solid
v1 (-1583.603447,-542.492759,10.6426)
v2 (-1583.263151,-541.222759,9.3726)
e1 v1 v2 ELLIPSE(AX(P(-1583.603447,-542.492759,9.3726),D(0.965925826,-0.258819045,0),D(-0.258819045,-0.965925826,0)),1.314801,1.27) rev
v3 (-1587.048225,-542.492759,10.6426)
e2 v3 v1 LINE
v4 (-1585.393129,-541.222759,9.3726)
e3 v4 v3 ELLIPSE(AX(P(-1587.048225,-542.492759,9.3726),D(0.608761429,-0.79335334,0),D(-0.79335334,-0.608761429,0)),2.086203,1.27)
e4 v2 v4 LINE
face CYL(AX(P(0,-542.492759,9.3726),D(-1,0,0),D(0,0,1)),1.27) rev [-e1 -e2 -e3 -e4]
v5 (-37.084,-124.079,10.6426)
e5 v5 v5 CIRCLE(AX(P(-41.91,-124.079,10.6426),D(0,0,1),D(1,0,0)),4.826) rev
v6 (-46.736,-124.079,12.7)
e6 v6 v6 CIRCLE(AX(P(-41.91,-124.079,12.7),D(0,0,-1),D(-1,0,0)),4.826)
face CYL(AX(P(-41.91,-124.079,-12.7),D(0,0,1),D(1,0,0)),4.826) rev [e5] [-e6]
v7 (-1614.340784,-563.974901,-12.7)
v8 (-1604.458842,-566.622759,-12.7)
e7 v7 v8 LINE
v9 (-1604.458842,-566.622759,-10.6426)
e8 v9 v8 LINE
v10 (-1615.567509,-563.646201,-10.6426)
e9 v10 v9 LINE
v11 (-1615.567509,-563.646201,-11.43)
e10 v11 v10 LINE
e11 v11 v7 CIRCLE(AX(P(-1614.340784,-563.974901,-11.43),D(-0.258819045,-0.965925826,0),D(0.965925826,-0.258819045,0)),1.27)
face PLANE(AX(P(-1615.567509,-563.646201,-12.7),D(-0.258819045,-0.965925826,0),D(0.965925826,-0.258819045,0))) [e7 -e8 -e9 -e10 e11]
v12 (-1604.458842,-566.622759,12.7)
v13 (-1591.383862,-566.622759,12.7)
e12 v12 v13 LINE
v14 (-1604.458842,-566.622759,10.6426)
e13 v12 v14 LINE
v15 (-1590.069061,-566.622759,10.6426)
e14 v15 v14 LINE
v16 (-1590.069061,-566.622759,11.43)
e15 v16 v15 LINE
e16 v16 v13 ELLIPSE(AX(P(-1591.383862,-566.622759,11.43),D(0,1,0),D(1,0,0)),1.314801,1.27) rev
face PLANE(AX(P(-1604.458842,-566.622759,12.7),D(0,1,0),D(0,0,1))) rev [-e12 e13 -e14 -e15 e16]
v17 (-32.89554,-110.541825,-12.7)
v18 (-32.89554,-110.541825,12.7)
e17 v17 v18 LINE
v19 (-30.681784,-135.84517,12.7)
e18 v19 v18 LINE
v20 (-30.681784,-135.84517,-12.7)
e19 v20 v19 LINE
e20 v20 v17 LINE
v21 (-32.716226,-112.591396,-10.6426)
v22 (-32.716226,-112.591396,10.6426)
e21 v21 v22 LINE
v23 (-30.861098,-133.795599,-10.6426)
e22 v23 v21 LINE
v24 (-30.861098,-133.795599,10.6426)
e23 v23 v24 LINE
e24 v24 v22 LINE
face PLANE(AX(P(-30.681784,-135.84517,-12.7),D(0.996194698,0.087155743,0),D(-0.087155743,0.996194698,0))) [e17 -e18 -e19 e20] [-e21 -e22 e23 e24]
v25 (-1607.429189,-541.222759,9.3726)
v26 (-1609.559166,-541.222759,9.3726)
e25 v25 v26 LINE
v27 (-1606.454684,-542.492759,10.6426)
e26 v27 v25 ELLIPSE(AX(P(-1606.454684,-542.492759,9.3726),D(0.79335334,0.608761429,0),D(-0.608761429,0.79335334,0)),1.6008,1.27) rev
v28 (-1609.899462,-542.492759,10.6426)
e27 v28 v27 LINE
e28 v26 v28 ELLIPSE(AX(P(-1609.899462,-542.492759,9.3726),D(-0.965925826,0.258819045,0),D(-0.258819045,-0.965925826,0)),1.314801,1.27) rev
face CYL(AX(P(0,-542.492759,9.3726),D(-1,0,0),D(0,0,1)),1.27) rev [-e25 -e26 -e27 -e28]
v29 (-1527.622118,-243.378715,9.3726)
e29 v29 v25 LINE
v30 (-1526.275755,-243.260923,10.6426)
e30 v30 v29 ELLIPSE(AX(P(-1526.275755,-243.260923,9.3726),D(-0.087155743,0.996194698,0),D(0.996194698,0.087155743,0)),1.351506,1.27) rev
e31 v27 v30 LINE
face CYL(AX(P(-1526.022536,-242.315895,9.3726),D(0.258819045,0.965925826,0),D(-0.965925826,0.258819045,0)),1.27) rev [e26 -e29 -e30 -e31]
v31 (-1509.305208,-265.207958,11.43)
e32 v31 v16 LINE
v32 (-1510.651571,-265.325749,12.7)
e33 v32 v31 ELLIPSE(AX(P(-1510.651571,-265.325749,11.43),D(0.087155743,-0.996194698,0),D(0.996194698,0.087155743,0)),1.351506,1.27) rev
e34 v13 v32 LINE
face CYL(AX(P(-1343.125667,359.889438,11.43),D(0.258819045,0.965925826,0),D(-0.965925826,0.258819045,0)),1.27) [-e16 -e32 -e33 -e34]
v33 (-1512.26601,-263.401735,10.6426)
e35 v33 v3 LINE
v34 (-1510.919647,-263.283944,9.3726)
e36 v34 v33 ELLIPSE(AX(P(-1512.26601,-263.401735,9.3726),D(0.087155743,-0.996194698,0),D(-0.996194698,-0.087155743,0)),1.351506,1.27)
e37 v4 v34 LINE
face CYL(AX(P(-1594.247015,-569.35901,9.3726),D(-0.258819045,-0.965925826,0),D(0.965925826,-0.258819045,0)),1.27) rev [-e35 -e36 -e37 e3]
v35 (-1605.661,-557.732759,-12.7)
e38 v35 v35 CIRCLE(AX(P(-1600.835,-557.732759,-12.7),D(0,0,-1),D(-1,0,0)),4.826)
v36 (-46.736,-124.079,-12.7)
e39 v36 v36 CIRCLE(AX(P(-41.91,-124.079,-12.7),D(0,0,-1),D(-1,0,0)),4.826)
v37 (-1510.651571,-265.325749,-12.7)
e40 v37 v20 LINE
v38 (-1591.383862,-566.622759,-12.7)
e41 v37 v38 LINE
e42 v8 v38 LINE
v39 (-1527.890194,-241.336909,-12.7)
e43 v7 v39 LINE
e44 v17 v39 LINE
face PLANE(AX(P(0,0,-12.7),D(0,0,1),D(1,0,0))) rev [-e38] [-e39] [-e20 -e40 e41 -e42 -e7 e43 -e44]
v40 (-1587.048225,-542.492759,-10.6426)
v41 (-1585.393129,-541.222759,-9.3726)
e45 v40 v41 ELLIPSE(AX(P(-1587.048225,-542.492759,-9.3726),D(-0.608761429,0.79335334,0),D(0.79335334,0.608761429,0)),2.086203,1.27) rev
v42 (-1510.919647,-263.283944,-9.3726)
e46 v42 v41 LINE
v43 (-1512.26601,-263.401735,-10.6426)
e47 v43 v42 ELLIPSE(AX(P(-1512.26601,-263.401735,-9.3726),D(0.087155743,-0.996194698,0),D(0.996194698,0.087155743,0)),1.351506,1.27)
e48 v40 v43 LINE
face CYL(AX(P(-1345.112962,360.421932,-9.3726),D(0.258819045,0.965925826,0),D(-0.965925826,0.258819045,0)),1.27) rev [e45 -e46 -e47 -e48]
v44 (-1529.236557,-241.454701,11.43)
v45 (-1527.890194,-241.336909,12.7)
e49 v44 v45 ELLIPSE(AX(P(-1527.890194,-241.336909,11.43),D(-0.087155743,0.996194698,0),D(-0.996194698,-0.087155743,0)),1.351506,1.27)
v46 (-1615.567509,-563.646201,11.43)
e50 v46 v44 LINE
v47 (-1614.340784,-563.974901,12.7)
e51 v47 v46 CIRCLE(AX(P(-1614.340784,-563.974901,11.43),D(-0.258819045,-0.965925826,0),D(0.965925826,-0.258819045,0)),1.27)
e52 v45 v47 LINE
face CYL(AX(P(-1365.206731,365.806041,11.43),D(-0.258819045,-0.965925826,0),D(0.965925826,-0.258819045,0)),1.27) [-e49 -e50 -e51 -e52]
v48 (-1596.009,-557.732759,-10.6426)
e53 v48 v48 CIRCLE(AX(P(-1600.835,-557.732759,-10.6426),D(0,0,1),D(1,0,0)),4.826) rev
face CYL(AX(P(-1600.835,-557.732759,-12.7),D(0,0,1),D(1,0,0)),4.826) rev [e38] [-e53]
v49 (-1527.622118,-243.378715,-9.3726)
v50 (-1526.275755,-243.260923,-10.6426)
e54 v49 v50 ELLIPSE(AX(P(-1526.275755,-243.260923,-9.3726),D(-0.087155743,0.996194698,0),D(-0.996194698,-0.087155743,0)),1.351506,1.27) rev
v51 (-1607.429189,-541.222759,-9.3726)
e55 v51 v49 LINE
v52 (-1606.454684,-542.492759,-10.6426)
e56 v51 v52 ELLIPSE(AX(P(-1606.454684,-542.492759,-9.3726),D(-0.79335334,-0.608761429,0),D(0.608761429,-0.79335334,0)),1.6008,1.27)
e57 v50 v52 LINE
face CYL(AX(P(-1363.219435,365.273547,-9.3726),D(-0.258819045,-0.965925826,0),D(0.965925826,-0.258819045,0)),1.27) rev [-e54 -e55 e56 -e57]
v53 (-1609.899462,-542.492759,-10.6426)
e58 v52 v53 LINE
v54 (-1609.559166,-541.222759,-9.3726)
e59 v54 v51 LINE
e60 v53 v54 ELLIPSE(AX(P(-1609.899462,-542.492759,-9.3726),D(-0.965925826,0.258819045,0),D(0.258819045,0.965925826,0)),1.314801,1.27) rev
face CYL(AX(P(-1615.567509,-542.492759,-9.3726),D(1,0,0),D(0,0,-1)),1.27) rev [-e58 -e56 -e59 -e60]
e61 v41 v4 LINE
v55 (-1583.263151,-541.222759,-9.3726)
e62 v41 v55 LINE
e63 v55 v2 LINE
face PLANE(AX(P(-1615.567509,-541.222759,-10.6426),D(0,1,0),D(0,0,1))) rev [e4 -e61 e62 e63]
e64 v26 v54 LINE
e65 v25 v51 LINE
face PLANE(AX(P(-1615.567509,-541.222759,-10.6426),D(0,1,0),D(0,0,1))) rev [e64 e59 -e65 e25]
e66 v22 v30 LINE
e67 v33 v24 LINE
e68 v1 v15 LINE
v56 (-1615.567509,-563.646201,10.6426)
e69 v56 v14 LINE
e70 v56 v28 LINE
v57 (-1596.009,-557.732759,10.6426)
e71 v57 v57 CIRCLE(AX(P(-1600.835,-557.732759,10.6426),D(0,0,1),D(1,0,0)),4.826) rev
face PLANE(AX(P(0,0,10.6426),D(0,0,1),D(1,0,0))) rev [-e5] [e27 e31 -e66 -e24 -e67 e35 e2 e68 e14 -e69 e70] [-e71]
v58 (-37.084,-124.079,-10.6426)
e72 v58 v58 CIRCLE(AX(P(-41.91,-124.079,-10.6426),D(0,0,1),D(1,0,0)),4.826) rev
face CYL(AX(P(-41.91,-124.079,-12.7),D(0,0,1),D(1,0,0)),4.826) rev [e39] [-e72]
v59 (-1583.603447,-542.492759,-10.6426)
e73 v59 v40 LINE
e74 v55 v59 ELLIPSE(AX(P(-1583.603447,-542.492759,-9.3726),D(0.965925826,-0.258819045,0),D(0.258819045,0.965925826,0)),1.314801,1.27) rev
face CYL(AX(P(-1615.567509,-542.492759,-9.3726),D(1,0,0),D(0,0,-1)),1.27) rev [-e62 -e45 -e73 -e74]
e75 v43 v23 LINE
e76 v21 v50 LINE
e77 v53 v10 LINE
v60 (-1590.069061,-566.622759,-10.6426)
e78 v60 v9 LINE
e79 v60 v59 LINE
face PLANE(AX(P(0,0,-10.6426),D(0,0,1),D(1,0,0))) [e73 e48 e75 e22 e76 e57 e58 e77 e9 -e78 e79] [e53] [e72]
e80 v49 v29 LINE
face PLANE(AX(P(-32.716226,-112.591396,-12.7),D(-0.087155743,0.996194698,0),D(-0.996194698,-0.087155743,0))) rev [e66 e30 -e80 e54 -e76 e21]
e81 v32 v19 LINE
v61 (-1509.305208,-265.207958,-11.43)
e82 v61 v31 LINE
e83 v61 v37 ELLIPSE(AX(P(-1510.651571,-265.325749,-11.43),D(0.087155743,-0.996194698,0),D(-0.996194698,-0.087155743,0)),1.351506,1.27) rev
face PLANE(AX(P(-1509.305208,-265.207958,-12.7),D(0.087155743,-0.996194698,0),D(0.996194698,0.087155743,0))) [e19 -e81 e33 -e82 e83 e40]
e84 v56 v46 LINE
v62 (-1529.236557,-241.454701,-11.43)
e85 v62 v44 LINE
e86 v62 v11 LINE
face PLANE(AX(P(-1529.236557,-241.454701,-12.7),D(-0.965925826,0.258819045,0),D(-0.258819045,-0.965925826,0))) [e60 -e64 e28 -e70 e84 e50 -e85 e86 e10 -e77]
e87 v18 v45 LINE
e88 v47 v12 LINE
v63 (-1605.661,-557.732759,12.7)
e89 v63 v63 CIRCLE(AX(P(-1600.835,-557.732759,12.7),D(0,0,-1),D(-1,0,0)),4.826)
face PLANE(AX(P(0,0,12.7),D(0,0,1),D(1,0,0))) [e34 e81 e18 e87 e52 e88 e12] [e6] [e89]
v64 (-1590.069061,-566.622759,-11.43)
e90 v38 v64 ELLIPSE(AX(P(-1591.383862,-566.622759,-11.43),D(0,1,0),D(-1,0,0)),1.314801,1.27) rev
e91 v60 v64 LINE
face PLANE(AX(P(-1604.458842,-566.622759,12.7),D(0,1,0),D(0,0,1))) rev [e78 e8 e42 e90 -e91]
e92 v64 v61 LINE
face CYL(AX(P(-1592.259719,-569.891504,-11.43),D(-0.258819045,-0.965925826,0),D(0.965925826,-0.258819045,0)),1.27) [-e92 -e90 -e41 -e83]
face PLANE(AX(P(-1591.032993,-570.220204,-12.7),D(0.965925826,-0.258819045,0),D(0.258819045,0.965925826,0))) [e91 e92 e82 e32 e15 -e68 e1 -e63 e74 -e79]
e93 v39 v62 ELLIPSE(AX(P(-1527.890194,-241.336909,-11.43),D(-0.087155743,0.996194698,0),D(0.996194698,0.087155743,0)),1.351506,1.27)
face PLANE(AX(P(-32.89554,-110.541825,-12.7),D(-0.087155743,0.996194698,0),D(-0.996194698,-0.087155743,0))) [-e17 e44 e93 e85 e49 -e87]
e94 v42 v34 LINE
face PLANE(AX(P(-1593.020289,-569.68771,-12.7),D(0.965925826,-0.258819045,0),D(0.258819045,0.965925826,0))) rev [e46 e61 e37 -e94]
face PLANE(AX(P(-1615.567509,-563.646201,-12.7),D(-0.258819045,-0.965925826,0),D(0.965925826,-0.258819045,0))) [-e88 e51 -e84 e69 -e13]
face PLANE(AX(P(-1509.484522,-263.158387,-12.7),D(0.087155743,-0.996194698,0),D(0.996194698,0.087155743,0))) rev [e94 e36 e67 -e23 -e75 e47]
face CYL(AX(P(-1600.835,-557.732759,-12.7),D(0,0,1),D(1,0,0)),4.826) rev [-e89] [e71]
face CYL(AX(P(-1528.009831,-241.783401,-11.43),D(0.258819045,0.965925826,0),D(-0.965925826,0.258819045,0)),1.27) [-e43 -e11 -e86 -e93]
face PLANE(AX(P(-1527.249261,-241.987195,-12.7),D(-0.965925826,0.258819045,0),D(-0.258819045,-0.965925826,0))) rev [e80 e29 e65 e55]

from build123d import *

# Parameters (mm, degrees)
SKETCH1_R           = 4.82599999999999
SKETCH1_R_2         = 4.825999999999997
BOSS_EXTRUDE1_DEPTH = 12.7
SHELL1_T            = -2.0574
FILLET1_R           = 1.27
CUT_EXTRUDE1_DEPTH  = 1714.433575902649
SKETCH3_W           = 21.285199999999943
SKETCH3_H           = 25.40000000000009
CUT_EXTRUDE2_DEPTH  = 1713.0984254933278
FILLET2_R           = 1.27


with BuildPart() as part:
    # Sketch1 → Boss-Extrude1 (new, symmetric)
    with BuildSketch(Plane(origin=(0, -98.29799999999999, -2.776e-14), x_dir=(-1, 0, 0), z_dir=(0, 0, -1))):
        Polygon((32.895539800283125, -12.243824987918671), (1529.236557174524, -143.1567007770127), (1615.5675093984726, -465.34820074258795), (1591.0329934107308, -471.92220448819177), (1509.305208165673, -166.9099575635606), (30.681783934492614, -37.54717031944891), align=None)
        with Locations((41.910000000000004, -25.781000000000002)):
            Circle(SKETCH1_R, mode=Mode.SUBTRACT)
        with Locations((1600.835, -459.4347591199864)):
            Circle(SKETCH1_R_2, mode=Mode.SUBTRACT)
    extrude(amount=BOSS_EXTRUDE1_DEPTH, both=True)

    # Shell1
    shell1_openings = [part.faces().sort_by_distance(p)[0] for p in [
        (-31.788661867, -123.193497654, 0),
        (-1603.300251405, -566.933202615, 0),
        (-1596.009, -557.73275912, 0),
        (-37.084, -124.079, 0),
    ]]
    offset(amount=SHELL1_T, openings=shell1_openings, kind=Kind.INTERSECTION)

    # Fillet1
    fillet1_edges = [part.edges().sort_by_distance(p)[0] for p in [
        (-1572.4020332864984, -402.55045075980036, -12.700000000000028),
        (-1551.9699683205642, -416.485826974324, 10.642599999999971),
        (-1570.6011657541362, -403.77870481135244, 10.642599999999971),
        (-1570.6011657541362, -403.77870481135244, -10.642600000000028),
        (-1551.9699683205642, -416.485826974324, -10.642600000000028),
        (-1572.4020332864984, -402.55045075980036, 12.69999999999997),
        (-1550.1691007882018, -417.71408102587617, 12.69999999999997),
        (-1550.1691007882018, -417.71408102587617, -12.700000000000028),
    ]]
    fillet(fillet1_edges, radius=FILLET1_R)

    # Sketch2 → Cut-Extrude1 (cut, through all)
    with BuildSketch(Plane(origin=(0, 0, -12.700000000000028), x_dir=(-1, 0, 0), z_dir=(0, 0, -1))):
        Polygon((1604.4588423023201, -566.6227591199881), (1590.0690608295056, -566.6227591199881), (1591.0329934107308, -570.2202044881918), align=None)
    extrude(amount=-CUT_EXTRUDE1_DEPTH, mode=Mode.SUBTRACT)

    # Sketch3 → Cut-Extrude2 (cut, through all)
    with BuildSketch(Plane(origin=(0, 0, 0), x_dir=(0, 0, -1), z_dir=(1, 0, 0))):
        with Locations((0, -553.9227591199873)):
            Rectangle(SKETCH3_W, SKETCH3_H)
    extrude(amount=-CUT_EXTRUDE2_DEPTH, mode=Mode.SUBTRACT)

    # Fillet2
    fillet2_edges = [part.edges().sort_by_distance(p)[0] for p in [
        (-1607.836777342822, -541.2227591199872, -10.642599999999971),
        (-1584.9855403231031, -541.2227591199872, -10.642599999999971),
        (-1607.836777342822, -541.2227591199872, 10.642599999999971),
        (-1584.9855403231031, -541.2227591199872, 10.642599999999971),
    ]]
    fillet(fillet2_edges, radius=FILLET2_R - 0.0001)  # a hair under: the kernel refuses the full size


solid = part.part
